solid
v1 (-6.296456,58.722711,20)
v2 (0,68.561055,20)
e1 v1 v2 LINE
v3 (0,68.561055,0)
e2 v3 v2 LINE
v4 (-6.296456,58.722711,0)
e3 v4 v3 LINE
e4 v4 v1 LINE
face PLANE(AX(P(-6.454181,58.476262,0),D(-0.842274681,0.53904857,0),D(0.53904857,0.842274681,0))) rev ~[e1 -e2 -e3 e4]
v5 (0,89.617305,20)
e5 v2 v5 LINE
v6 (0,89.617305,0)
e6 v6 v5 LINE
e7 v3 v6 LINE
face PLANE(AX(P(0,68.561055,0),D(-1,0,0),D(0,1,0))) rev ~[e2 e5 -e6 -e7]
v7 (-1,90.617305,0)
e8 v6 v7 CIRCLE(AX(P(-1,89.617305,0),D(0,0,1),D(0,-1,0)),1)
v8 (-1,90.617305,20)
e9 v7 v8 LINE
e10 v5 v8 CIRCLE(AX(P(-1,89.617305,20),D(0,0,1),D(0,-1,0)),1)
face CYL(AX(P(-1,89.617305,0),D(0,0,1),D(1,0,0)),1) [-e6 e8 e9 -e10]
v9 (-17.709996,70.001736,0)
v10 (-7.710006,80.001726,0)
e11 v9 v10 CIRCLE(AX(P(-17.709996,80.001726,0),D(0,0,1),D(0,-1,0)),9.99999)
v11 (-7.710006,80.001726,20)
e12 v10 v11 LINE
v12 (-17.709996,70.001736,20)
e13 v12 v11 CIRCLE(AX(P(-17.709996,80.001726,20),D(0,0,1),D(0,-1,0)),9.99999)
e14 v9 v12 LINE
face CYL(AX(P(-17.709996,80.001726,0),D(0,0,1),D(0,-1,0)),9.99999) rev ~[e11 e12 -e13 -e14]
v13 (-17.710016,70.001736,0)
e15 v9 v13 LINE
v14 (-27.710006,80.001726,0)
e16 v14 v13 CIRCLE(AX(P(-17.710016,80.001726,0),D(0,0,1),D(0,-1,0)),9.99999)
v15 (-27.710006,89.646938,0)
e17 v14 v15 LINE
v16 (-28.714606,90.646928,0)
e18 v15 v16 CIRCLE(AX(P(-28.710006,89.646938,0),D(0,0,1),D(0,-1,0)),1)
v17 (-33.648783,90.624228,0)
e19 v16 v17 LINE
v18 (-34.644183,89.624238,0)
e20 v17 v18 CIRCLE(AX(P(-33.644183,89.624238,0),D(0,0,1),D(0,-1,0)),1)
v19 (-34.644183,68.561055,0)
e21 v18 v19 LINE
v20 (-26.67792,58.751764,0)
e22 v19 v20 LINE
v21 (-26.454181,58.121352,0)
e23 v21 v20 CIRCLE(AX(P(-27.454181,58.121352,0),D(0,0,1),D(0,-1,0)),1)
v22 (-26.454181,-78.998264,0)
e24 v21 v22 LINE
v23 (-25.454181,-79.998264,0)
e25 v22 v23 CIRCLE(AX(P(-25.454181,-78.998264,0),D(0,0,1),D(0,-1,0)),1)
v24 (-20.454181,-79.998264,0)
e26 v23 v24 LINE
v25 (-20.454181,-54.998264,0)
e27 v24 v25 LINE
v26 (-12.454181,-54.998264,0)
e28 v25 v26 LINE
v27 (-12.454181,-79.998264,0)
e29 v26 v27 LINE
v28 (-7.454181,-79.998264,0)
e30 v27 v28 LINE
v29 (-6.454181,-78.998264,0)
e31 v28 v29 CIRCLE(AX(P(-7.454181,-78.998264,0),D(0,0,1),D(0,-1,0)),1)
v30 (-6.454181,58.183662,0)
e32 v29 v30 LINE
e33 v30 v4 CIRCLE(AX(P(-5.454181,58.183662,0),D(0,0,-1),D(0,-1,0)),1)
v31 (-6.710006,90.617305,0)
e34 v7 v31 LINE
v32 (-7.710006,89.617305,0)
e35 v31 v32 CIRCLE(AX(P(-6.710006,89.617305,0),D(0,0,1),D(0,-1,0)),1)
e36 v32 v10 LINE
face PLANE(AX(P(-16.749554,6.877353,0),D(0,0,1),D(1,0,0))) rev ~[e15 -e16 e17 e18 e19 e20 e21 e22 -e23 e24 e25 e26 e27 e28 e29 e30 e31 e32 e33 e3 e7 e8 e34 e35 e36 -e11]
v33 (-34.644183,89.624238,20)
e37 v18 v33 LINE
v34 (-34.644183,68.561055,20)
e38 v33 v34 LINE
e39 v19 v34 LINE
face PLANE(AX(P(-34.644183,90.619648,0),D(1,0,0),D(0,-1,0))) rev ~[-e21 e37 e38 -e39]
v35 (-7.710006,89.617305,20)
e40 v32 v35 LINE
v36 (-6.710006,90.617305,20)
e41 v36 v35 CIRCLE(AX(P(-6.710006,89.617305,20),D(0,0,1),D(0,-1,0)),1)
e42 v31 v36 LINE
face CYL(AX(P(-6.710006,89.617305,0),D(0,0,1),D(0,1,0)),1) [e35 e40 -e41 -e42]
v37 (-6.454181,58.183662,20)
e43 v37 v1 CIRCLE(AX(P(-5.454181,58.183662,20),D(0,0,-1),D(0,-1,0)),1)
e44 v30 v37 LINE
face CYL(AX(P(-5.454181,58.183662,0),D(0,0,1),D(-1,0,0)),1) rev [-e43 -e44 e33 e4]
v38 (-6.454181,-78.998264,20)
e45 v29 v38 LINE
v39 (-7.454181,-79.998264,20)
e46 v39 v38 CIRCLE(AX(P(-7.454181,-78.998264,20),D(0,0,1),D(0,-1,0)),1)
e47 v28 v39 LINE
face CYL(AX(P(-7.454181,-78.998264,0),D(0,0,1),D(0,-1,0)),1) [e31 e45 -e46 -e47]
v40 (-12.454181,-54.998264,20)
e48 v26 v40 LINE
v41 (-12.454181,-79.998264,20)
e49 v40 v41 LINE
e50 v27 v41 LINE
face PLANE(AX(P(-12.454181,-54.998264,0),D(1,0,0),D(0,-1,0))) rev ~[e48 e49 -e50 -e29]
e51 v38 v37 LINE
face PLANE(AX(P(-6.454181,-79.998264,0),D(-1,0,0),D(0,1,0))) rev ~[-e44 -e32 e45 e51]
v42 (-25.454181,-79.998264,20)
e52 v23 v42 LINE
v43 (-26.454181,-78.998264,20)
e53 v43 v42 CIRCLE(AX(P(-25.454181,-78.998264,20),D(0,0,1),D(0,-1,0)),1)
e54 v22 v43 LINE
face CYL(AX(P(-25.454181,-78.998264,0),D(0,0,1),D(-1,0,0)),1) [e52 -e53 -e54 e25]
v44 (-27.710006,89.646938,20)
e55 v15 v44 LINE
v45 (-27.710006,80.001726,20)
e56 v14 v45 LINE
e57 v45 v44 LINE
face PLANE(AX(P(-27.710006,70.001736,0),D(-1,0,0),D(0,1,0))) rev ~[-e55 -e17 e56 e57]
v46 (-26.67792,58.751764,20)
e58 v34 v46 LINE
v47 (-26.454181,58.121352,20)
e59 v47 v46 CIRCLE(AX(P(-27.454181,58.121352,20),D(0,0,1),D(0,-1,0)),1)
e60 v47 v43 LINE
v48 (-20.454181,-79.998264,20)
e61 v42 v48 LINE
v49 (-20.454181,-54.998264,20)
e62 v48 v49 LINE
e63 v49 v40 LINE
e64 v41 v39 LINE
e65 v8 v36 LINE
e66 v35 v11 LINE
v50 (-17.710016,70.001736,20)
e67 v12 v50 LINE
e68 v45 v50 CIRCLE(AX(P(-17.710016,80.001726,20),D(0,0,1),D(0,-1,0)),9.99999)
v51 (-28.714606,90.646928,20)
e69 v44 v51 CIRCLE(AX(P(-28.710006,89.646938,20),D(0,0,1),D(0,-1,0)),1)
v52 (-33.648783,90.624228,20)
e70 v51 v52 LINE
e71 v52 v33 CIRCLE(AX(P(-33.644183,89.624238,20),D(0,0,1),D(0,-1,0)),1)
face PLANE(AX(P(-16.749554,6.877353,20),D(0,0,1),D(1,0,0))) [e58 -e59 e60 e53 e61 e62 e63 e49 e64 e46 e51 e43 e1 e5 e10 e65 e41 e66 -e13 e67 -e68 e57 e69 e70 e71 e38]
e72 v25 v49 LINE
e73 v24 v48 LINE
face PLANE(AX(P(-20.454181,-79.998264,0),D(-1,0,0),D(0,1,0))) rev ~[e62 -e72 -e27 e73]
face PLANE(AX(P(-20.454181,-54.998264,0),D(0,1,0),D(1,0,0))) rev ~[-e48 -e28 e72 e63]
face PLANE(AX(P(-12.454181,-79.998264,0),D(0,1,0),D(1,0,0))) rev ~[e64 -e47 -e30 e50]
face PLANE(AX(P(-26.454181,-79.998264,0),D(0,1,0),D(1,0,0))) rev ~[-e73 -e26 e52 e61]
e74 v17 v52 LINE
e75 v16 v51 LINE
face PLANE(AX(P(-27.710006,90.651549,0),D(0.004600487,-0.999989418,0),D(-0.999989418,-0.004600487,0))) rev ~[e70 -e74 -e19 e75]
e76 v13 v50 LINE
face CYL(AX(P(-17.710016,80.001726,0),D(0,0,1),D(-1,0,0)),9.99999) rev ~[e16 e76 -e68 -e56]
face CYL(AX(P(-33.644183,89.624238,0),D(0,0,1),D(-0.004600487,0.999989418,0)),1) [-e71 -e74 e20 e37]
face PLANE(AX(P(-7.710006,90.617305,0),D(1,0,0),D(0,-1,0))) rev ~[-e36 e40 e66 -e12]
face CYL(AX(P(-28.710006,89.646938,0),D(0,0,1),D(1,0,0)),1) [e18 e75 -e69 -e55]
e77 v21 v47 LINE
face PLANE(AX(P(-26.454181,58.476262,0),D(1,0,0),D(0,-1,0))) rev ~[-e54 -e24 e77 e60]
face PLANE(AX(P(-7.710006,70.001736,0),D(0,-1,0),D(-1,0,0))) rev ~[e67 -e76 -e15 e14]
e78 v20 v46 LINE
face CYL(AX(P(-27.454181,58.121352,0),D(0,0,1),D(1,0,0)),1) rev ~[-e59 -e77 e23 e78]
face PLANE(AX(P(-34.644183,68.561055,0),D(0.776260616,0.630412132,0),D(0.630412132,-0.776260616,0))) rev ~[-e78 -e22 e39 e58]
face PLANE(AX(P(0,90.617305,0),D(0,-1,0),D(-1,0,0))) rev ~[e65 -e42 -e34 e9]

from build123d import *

# Parameters (mm, degrees)
F1_DEPTH = 20
F2_R     = 1
F3_R     = 9.99999


# Not quite as in the source:
# - two fillets or chamfers of one size are made in one step
# - a fillet or chamfer is up to 0.001 mm smaller than in the source, because OpenCascade refuses the exact size


with BuildPart() as f1:
    # F0 (on Top) → F1 (new body)
    with BuildSketch(Plane.XY):
        Polygon((-26.4541809829, 58.4762617946), (-26.4541809829, -79.9982637167), (-20.4541809829, -79.9982637167), (-20.4541809829, -54.9982637167), (-12.4541809829, -54.9982637167), (-12.4541809829, -79.9982637167), (-6.4541809829, -79.9982637167), (-6.4541809829, 58.4762617946), (0, 68.5610547662), (0, 90.617305144), (-7.710005641, 90.617305144), (-7.710005641, 70.0017362833), (-27.710005641, 70.0017362833), (-27.710005641, 90.6515493989), (-34.6441827714, 90.6196484681), (-34.6441827714, 68.5610547662), align=None)
    extrude(amount=F1_DEPTH)

    # F2
    f2_edges = [f1.edges().sort_by_distance(p)[0] for p in [
        (-26.454181, -79.998264, 10),
        (-6.454181, -79.998264, 10),
        (-27.710006, 90.651549, 10),
        (-34.644183, 90.619648, 10),
        (-26.454181, 58.476262, 10),
        (-6.454181, 58.476262, 10),
        (0, 90.617305, 10),
        (-7.710006, 90.617305, 10),
    ]]
    fillet(f2_edges, radius=F2_R)

    # F3 (radius 10 in the source; OpenCascade refuses exactly that, so slightly less here)
    f3_edges = [f1.edges().sort_by_distance(p)[0] for p in [
        (-7.710006, 70.001736, 10),
        (-27.710006, 70.001736, 10),
    ]]
    fillet(f3_edges, radius=F3_R)


solid = f1.part
